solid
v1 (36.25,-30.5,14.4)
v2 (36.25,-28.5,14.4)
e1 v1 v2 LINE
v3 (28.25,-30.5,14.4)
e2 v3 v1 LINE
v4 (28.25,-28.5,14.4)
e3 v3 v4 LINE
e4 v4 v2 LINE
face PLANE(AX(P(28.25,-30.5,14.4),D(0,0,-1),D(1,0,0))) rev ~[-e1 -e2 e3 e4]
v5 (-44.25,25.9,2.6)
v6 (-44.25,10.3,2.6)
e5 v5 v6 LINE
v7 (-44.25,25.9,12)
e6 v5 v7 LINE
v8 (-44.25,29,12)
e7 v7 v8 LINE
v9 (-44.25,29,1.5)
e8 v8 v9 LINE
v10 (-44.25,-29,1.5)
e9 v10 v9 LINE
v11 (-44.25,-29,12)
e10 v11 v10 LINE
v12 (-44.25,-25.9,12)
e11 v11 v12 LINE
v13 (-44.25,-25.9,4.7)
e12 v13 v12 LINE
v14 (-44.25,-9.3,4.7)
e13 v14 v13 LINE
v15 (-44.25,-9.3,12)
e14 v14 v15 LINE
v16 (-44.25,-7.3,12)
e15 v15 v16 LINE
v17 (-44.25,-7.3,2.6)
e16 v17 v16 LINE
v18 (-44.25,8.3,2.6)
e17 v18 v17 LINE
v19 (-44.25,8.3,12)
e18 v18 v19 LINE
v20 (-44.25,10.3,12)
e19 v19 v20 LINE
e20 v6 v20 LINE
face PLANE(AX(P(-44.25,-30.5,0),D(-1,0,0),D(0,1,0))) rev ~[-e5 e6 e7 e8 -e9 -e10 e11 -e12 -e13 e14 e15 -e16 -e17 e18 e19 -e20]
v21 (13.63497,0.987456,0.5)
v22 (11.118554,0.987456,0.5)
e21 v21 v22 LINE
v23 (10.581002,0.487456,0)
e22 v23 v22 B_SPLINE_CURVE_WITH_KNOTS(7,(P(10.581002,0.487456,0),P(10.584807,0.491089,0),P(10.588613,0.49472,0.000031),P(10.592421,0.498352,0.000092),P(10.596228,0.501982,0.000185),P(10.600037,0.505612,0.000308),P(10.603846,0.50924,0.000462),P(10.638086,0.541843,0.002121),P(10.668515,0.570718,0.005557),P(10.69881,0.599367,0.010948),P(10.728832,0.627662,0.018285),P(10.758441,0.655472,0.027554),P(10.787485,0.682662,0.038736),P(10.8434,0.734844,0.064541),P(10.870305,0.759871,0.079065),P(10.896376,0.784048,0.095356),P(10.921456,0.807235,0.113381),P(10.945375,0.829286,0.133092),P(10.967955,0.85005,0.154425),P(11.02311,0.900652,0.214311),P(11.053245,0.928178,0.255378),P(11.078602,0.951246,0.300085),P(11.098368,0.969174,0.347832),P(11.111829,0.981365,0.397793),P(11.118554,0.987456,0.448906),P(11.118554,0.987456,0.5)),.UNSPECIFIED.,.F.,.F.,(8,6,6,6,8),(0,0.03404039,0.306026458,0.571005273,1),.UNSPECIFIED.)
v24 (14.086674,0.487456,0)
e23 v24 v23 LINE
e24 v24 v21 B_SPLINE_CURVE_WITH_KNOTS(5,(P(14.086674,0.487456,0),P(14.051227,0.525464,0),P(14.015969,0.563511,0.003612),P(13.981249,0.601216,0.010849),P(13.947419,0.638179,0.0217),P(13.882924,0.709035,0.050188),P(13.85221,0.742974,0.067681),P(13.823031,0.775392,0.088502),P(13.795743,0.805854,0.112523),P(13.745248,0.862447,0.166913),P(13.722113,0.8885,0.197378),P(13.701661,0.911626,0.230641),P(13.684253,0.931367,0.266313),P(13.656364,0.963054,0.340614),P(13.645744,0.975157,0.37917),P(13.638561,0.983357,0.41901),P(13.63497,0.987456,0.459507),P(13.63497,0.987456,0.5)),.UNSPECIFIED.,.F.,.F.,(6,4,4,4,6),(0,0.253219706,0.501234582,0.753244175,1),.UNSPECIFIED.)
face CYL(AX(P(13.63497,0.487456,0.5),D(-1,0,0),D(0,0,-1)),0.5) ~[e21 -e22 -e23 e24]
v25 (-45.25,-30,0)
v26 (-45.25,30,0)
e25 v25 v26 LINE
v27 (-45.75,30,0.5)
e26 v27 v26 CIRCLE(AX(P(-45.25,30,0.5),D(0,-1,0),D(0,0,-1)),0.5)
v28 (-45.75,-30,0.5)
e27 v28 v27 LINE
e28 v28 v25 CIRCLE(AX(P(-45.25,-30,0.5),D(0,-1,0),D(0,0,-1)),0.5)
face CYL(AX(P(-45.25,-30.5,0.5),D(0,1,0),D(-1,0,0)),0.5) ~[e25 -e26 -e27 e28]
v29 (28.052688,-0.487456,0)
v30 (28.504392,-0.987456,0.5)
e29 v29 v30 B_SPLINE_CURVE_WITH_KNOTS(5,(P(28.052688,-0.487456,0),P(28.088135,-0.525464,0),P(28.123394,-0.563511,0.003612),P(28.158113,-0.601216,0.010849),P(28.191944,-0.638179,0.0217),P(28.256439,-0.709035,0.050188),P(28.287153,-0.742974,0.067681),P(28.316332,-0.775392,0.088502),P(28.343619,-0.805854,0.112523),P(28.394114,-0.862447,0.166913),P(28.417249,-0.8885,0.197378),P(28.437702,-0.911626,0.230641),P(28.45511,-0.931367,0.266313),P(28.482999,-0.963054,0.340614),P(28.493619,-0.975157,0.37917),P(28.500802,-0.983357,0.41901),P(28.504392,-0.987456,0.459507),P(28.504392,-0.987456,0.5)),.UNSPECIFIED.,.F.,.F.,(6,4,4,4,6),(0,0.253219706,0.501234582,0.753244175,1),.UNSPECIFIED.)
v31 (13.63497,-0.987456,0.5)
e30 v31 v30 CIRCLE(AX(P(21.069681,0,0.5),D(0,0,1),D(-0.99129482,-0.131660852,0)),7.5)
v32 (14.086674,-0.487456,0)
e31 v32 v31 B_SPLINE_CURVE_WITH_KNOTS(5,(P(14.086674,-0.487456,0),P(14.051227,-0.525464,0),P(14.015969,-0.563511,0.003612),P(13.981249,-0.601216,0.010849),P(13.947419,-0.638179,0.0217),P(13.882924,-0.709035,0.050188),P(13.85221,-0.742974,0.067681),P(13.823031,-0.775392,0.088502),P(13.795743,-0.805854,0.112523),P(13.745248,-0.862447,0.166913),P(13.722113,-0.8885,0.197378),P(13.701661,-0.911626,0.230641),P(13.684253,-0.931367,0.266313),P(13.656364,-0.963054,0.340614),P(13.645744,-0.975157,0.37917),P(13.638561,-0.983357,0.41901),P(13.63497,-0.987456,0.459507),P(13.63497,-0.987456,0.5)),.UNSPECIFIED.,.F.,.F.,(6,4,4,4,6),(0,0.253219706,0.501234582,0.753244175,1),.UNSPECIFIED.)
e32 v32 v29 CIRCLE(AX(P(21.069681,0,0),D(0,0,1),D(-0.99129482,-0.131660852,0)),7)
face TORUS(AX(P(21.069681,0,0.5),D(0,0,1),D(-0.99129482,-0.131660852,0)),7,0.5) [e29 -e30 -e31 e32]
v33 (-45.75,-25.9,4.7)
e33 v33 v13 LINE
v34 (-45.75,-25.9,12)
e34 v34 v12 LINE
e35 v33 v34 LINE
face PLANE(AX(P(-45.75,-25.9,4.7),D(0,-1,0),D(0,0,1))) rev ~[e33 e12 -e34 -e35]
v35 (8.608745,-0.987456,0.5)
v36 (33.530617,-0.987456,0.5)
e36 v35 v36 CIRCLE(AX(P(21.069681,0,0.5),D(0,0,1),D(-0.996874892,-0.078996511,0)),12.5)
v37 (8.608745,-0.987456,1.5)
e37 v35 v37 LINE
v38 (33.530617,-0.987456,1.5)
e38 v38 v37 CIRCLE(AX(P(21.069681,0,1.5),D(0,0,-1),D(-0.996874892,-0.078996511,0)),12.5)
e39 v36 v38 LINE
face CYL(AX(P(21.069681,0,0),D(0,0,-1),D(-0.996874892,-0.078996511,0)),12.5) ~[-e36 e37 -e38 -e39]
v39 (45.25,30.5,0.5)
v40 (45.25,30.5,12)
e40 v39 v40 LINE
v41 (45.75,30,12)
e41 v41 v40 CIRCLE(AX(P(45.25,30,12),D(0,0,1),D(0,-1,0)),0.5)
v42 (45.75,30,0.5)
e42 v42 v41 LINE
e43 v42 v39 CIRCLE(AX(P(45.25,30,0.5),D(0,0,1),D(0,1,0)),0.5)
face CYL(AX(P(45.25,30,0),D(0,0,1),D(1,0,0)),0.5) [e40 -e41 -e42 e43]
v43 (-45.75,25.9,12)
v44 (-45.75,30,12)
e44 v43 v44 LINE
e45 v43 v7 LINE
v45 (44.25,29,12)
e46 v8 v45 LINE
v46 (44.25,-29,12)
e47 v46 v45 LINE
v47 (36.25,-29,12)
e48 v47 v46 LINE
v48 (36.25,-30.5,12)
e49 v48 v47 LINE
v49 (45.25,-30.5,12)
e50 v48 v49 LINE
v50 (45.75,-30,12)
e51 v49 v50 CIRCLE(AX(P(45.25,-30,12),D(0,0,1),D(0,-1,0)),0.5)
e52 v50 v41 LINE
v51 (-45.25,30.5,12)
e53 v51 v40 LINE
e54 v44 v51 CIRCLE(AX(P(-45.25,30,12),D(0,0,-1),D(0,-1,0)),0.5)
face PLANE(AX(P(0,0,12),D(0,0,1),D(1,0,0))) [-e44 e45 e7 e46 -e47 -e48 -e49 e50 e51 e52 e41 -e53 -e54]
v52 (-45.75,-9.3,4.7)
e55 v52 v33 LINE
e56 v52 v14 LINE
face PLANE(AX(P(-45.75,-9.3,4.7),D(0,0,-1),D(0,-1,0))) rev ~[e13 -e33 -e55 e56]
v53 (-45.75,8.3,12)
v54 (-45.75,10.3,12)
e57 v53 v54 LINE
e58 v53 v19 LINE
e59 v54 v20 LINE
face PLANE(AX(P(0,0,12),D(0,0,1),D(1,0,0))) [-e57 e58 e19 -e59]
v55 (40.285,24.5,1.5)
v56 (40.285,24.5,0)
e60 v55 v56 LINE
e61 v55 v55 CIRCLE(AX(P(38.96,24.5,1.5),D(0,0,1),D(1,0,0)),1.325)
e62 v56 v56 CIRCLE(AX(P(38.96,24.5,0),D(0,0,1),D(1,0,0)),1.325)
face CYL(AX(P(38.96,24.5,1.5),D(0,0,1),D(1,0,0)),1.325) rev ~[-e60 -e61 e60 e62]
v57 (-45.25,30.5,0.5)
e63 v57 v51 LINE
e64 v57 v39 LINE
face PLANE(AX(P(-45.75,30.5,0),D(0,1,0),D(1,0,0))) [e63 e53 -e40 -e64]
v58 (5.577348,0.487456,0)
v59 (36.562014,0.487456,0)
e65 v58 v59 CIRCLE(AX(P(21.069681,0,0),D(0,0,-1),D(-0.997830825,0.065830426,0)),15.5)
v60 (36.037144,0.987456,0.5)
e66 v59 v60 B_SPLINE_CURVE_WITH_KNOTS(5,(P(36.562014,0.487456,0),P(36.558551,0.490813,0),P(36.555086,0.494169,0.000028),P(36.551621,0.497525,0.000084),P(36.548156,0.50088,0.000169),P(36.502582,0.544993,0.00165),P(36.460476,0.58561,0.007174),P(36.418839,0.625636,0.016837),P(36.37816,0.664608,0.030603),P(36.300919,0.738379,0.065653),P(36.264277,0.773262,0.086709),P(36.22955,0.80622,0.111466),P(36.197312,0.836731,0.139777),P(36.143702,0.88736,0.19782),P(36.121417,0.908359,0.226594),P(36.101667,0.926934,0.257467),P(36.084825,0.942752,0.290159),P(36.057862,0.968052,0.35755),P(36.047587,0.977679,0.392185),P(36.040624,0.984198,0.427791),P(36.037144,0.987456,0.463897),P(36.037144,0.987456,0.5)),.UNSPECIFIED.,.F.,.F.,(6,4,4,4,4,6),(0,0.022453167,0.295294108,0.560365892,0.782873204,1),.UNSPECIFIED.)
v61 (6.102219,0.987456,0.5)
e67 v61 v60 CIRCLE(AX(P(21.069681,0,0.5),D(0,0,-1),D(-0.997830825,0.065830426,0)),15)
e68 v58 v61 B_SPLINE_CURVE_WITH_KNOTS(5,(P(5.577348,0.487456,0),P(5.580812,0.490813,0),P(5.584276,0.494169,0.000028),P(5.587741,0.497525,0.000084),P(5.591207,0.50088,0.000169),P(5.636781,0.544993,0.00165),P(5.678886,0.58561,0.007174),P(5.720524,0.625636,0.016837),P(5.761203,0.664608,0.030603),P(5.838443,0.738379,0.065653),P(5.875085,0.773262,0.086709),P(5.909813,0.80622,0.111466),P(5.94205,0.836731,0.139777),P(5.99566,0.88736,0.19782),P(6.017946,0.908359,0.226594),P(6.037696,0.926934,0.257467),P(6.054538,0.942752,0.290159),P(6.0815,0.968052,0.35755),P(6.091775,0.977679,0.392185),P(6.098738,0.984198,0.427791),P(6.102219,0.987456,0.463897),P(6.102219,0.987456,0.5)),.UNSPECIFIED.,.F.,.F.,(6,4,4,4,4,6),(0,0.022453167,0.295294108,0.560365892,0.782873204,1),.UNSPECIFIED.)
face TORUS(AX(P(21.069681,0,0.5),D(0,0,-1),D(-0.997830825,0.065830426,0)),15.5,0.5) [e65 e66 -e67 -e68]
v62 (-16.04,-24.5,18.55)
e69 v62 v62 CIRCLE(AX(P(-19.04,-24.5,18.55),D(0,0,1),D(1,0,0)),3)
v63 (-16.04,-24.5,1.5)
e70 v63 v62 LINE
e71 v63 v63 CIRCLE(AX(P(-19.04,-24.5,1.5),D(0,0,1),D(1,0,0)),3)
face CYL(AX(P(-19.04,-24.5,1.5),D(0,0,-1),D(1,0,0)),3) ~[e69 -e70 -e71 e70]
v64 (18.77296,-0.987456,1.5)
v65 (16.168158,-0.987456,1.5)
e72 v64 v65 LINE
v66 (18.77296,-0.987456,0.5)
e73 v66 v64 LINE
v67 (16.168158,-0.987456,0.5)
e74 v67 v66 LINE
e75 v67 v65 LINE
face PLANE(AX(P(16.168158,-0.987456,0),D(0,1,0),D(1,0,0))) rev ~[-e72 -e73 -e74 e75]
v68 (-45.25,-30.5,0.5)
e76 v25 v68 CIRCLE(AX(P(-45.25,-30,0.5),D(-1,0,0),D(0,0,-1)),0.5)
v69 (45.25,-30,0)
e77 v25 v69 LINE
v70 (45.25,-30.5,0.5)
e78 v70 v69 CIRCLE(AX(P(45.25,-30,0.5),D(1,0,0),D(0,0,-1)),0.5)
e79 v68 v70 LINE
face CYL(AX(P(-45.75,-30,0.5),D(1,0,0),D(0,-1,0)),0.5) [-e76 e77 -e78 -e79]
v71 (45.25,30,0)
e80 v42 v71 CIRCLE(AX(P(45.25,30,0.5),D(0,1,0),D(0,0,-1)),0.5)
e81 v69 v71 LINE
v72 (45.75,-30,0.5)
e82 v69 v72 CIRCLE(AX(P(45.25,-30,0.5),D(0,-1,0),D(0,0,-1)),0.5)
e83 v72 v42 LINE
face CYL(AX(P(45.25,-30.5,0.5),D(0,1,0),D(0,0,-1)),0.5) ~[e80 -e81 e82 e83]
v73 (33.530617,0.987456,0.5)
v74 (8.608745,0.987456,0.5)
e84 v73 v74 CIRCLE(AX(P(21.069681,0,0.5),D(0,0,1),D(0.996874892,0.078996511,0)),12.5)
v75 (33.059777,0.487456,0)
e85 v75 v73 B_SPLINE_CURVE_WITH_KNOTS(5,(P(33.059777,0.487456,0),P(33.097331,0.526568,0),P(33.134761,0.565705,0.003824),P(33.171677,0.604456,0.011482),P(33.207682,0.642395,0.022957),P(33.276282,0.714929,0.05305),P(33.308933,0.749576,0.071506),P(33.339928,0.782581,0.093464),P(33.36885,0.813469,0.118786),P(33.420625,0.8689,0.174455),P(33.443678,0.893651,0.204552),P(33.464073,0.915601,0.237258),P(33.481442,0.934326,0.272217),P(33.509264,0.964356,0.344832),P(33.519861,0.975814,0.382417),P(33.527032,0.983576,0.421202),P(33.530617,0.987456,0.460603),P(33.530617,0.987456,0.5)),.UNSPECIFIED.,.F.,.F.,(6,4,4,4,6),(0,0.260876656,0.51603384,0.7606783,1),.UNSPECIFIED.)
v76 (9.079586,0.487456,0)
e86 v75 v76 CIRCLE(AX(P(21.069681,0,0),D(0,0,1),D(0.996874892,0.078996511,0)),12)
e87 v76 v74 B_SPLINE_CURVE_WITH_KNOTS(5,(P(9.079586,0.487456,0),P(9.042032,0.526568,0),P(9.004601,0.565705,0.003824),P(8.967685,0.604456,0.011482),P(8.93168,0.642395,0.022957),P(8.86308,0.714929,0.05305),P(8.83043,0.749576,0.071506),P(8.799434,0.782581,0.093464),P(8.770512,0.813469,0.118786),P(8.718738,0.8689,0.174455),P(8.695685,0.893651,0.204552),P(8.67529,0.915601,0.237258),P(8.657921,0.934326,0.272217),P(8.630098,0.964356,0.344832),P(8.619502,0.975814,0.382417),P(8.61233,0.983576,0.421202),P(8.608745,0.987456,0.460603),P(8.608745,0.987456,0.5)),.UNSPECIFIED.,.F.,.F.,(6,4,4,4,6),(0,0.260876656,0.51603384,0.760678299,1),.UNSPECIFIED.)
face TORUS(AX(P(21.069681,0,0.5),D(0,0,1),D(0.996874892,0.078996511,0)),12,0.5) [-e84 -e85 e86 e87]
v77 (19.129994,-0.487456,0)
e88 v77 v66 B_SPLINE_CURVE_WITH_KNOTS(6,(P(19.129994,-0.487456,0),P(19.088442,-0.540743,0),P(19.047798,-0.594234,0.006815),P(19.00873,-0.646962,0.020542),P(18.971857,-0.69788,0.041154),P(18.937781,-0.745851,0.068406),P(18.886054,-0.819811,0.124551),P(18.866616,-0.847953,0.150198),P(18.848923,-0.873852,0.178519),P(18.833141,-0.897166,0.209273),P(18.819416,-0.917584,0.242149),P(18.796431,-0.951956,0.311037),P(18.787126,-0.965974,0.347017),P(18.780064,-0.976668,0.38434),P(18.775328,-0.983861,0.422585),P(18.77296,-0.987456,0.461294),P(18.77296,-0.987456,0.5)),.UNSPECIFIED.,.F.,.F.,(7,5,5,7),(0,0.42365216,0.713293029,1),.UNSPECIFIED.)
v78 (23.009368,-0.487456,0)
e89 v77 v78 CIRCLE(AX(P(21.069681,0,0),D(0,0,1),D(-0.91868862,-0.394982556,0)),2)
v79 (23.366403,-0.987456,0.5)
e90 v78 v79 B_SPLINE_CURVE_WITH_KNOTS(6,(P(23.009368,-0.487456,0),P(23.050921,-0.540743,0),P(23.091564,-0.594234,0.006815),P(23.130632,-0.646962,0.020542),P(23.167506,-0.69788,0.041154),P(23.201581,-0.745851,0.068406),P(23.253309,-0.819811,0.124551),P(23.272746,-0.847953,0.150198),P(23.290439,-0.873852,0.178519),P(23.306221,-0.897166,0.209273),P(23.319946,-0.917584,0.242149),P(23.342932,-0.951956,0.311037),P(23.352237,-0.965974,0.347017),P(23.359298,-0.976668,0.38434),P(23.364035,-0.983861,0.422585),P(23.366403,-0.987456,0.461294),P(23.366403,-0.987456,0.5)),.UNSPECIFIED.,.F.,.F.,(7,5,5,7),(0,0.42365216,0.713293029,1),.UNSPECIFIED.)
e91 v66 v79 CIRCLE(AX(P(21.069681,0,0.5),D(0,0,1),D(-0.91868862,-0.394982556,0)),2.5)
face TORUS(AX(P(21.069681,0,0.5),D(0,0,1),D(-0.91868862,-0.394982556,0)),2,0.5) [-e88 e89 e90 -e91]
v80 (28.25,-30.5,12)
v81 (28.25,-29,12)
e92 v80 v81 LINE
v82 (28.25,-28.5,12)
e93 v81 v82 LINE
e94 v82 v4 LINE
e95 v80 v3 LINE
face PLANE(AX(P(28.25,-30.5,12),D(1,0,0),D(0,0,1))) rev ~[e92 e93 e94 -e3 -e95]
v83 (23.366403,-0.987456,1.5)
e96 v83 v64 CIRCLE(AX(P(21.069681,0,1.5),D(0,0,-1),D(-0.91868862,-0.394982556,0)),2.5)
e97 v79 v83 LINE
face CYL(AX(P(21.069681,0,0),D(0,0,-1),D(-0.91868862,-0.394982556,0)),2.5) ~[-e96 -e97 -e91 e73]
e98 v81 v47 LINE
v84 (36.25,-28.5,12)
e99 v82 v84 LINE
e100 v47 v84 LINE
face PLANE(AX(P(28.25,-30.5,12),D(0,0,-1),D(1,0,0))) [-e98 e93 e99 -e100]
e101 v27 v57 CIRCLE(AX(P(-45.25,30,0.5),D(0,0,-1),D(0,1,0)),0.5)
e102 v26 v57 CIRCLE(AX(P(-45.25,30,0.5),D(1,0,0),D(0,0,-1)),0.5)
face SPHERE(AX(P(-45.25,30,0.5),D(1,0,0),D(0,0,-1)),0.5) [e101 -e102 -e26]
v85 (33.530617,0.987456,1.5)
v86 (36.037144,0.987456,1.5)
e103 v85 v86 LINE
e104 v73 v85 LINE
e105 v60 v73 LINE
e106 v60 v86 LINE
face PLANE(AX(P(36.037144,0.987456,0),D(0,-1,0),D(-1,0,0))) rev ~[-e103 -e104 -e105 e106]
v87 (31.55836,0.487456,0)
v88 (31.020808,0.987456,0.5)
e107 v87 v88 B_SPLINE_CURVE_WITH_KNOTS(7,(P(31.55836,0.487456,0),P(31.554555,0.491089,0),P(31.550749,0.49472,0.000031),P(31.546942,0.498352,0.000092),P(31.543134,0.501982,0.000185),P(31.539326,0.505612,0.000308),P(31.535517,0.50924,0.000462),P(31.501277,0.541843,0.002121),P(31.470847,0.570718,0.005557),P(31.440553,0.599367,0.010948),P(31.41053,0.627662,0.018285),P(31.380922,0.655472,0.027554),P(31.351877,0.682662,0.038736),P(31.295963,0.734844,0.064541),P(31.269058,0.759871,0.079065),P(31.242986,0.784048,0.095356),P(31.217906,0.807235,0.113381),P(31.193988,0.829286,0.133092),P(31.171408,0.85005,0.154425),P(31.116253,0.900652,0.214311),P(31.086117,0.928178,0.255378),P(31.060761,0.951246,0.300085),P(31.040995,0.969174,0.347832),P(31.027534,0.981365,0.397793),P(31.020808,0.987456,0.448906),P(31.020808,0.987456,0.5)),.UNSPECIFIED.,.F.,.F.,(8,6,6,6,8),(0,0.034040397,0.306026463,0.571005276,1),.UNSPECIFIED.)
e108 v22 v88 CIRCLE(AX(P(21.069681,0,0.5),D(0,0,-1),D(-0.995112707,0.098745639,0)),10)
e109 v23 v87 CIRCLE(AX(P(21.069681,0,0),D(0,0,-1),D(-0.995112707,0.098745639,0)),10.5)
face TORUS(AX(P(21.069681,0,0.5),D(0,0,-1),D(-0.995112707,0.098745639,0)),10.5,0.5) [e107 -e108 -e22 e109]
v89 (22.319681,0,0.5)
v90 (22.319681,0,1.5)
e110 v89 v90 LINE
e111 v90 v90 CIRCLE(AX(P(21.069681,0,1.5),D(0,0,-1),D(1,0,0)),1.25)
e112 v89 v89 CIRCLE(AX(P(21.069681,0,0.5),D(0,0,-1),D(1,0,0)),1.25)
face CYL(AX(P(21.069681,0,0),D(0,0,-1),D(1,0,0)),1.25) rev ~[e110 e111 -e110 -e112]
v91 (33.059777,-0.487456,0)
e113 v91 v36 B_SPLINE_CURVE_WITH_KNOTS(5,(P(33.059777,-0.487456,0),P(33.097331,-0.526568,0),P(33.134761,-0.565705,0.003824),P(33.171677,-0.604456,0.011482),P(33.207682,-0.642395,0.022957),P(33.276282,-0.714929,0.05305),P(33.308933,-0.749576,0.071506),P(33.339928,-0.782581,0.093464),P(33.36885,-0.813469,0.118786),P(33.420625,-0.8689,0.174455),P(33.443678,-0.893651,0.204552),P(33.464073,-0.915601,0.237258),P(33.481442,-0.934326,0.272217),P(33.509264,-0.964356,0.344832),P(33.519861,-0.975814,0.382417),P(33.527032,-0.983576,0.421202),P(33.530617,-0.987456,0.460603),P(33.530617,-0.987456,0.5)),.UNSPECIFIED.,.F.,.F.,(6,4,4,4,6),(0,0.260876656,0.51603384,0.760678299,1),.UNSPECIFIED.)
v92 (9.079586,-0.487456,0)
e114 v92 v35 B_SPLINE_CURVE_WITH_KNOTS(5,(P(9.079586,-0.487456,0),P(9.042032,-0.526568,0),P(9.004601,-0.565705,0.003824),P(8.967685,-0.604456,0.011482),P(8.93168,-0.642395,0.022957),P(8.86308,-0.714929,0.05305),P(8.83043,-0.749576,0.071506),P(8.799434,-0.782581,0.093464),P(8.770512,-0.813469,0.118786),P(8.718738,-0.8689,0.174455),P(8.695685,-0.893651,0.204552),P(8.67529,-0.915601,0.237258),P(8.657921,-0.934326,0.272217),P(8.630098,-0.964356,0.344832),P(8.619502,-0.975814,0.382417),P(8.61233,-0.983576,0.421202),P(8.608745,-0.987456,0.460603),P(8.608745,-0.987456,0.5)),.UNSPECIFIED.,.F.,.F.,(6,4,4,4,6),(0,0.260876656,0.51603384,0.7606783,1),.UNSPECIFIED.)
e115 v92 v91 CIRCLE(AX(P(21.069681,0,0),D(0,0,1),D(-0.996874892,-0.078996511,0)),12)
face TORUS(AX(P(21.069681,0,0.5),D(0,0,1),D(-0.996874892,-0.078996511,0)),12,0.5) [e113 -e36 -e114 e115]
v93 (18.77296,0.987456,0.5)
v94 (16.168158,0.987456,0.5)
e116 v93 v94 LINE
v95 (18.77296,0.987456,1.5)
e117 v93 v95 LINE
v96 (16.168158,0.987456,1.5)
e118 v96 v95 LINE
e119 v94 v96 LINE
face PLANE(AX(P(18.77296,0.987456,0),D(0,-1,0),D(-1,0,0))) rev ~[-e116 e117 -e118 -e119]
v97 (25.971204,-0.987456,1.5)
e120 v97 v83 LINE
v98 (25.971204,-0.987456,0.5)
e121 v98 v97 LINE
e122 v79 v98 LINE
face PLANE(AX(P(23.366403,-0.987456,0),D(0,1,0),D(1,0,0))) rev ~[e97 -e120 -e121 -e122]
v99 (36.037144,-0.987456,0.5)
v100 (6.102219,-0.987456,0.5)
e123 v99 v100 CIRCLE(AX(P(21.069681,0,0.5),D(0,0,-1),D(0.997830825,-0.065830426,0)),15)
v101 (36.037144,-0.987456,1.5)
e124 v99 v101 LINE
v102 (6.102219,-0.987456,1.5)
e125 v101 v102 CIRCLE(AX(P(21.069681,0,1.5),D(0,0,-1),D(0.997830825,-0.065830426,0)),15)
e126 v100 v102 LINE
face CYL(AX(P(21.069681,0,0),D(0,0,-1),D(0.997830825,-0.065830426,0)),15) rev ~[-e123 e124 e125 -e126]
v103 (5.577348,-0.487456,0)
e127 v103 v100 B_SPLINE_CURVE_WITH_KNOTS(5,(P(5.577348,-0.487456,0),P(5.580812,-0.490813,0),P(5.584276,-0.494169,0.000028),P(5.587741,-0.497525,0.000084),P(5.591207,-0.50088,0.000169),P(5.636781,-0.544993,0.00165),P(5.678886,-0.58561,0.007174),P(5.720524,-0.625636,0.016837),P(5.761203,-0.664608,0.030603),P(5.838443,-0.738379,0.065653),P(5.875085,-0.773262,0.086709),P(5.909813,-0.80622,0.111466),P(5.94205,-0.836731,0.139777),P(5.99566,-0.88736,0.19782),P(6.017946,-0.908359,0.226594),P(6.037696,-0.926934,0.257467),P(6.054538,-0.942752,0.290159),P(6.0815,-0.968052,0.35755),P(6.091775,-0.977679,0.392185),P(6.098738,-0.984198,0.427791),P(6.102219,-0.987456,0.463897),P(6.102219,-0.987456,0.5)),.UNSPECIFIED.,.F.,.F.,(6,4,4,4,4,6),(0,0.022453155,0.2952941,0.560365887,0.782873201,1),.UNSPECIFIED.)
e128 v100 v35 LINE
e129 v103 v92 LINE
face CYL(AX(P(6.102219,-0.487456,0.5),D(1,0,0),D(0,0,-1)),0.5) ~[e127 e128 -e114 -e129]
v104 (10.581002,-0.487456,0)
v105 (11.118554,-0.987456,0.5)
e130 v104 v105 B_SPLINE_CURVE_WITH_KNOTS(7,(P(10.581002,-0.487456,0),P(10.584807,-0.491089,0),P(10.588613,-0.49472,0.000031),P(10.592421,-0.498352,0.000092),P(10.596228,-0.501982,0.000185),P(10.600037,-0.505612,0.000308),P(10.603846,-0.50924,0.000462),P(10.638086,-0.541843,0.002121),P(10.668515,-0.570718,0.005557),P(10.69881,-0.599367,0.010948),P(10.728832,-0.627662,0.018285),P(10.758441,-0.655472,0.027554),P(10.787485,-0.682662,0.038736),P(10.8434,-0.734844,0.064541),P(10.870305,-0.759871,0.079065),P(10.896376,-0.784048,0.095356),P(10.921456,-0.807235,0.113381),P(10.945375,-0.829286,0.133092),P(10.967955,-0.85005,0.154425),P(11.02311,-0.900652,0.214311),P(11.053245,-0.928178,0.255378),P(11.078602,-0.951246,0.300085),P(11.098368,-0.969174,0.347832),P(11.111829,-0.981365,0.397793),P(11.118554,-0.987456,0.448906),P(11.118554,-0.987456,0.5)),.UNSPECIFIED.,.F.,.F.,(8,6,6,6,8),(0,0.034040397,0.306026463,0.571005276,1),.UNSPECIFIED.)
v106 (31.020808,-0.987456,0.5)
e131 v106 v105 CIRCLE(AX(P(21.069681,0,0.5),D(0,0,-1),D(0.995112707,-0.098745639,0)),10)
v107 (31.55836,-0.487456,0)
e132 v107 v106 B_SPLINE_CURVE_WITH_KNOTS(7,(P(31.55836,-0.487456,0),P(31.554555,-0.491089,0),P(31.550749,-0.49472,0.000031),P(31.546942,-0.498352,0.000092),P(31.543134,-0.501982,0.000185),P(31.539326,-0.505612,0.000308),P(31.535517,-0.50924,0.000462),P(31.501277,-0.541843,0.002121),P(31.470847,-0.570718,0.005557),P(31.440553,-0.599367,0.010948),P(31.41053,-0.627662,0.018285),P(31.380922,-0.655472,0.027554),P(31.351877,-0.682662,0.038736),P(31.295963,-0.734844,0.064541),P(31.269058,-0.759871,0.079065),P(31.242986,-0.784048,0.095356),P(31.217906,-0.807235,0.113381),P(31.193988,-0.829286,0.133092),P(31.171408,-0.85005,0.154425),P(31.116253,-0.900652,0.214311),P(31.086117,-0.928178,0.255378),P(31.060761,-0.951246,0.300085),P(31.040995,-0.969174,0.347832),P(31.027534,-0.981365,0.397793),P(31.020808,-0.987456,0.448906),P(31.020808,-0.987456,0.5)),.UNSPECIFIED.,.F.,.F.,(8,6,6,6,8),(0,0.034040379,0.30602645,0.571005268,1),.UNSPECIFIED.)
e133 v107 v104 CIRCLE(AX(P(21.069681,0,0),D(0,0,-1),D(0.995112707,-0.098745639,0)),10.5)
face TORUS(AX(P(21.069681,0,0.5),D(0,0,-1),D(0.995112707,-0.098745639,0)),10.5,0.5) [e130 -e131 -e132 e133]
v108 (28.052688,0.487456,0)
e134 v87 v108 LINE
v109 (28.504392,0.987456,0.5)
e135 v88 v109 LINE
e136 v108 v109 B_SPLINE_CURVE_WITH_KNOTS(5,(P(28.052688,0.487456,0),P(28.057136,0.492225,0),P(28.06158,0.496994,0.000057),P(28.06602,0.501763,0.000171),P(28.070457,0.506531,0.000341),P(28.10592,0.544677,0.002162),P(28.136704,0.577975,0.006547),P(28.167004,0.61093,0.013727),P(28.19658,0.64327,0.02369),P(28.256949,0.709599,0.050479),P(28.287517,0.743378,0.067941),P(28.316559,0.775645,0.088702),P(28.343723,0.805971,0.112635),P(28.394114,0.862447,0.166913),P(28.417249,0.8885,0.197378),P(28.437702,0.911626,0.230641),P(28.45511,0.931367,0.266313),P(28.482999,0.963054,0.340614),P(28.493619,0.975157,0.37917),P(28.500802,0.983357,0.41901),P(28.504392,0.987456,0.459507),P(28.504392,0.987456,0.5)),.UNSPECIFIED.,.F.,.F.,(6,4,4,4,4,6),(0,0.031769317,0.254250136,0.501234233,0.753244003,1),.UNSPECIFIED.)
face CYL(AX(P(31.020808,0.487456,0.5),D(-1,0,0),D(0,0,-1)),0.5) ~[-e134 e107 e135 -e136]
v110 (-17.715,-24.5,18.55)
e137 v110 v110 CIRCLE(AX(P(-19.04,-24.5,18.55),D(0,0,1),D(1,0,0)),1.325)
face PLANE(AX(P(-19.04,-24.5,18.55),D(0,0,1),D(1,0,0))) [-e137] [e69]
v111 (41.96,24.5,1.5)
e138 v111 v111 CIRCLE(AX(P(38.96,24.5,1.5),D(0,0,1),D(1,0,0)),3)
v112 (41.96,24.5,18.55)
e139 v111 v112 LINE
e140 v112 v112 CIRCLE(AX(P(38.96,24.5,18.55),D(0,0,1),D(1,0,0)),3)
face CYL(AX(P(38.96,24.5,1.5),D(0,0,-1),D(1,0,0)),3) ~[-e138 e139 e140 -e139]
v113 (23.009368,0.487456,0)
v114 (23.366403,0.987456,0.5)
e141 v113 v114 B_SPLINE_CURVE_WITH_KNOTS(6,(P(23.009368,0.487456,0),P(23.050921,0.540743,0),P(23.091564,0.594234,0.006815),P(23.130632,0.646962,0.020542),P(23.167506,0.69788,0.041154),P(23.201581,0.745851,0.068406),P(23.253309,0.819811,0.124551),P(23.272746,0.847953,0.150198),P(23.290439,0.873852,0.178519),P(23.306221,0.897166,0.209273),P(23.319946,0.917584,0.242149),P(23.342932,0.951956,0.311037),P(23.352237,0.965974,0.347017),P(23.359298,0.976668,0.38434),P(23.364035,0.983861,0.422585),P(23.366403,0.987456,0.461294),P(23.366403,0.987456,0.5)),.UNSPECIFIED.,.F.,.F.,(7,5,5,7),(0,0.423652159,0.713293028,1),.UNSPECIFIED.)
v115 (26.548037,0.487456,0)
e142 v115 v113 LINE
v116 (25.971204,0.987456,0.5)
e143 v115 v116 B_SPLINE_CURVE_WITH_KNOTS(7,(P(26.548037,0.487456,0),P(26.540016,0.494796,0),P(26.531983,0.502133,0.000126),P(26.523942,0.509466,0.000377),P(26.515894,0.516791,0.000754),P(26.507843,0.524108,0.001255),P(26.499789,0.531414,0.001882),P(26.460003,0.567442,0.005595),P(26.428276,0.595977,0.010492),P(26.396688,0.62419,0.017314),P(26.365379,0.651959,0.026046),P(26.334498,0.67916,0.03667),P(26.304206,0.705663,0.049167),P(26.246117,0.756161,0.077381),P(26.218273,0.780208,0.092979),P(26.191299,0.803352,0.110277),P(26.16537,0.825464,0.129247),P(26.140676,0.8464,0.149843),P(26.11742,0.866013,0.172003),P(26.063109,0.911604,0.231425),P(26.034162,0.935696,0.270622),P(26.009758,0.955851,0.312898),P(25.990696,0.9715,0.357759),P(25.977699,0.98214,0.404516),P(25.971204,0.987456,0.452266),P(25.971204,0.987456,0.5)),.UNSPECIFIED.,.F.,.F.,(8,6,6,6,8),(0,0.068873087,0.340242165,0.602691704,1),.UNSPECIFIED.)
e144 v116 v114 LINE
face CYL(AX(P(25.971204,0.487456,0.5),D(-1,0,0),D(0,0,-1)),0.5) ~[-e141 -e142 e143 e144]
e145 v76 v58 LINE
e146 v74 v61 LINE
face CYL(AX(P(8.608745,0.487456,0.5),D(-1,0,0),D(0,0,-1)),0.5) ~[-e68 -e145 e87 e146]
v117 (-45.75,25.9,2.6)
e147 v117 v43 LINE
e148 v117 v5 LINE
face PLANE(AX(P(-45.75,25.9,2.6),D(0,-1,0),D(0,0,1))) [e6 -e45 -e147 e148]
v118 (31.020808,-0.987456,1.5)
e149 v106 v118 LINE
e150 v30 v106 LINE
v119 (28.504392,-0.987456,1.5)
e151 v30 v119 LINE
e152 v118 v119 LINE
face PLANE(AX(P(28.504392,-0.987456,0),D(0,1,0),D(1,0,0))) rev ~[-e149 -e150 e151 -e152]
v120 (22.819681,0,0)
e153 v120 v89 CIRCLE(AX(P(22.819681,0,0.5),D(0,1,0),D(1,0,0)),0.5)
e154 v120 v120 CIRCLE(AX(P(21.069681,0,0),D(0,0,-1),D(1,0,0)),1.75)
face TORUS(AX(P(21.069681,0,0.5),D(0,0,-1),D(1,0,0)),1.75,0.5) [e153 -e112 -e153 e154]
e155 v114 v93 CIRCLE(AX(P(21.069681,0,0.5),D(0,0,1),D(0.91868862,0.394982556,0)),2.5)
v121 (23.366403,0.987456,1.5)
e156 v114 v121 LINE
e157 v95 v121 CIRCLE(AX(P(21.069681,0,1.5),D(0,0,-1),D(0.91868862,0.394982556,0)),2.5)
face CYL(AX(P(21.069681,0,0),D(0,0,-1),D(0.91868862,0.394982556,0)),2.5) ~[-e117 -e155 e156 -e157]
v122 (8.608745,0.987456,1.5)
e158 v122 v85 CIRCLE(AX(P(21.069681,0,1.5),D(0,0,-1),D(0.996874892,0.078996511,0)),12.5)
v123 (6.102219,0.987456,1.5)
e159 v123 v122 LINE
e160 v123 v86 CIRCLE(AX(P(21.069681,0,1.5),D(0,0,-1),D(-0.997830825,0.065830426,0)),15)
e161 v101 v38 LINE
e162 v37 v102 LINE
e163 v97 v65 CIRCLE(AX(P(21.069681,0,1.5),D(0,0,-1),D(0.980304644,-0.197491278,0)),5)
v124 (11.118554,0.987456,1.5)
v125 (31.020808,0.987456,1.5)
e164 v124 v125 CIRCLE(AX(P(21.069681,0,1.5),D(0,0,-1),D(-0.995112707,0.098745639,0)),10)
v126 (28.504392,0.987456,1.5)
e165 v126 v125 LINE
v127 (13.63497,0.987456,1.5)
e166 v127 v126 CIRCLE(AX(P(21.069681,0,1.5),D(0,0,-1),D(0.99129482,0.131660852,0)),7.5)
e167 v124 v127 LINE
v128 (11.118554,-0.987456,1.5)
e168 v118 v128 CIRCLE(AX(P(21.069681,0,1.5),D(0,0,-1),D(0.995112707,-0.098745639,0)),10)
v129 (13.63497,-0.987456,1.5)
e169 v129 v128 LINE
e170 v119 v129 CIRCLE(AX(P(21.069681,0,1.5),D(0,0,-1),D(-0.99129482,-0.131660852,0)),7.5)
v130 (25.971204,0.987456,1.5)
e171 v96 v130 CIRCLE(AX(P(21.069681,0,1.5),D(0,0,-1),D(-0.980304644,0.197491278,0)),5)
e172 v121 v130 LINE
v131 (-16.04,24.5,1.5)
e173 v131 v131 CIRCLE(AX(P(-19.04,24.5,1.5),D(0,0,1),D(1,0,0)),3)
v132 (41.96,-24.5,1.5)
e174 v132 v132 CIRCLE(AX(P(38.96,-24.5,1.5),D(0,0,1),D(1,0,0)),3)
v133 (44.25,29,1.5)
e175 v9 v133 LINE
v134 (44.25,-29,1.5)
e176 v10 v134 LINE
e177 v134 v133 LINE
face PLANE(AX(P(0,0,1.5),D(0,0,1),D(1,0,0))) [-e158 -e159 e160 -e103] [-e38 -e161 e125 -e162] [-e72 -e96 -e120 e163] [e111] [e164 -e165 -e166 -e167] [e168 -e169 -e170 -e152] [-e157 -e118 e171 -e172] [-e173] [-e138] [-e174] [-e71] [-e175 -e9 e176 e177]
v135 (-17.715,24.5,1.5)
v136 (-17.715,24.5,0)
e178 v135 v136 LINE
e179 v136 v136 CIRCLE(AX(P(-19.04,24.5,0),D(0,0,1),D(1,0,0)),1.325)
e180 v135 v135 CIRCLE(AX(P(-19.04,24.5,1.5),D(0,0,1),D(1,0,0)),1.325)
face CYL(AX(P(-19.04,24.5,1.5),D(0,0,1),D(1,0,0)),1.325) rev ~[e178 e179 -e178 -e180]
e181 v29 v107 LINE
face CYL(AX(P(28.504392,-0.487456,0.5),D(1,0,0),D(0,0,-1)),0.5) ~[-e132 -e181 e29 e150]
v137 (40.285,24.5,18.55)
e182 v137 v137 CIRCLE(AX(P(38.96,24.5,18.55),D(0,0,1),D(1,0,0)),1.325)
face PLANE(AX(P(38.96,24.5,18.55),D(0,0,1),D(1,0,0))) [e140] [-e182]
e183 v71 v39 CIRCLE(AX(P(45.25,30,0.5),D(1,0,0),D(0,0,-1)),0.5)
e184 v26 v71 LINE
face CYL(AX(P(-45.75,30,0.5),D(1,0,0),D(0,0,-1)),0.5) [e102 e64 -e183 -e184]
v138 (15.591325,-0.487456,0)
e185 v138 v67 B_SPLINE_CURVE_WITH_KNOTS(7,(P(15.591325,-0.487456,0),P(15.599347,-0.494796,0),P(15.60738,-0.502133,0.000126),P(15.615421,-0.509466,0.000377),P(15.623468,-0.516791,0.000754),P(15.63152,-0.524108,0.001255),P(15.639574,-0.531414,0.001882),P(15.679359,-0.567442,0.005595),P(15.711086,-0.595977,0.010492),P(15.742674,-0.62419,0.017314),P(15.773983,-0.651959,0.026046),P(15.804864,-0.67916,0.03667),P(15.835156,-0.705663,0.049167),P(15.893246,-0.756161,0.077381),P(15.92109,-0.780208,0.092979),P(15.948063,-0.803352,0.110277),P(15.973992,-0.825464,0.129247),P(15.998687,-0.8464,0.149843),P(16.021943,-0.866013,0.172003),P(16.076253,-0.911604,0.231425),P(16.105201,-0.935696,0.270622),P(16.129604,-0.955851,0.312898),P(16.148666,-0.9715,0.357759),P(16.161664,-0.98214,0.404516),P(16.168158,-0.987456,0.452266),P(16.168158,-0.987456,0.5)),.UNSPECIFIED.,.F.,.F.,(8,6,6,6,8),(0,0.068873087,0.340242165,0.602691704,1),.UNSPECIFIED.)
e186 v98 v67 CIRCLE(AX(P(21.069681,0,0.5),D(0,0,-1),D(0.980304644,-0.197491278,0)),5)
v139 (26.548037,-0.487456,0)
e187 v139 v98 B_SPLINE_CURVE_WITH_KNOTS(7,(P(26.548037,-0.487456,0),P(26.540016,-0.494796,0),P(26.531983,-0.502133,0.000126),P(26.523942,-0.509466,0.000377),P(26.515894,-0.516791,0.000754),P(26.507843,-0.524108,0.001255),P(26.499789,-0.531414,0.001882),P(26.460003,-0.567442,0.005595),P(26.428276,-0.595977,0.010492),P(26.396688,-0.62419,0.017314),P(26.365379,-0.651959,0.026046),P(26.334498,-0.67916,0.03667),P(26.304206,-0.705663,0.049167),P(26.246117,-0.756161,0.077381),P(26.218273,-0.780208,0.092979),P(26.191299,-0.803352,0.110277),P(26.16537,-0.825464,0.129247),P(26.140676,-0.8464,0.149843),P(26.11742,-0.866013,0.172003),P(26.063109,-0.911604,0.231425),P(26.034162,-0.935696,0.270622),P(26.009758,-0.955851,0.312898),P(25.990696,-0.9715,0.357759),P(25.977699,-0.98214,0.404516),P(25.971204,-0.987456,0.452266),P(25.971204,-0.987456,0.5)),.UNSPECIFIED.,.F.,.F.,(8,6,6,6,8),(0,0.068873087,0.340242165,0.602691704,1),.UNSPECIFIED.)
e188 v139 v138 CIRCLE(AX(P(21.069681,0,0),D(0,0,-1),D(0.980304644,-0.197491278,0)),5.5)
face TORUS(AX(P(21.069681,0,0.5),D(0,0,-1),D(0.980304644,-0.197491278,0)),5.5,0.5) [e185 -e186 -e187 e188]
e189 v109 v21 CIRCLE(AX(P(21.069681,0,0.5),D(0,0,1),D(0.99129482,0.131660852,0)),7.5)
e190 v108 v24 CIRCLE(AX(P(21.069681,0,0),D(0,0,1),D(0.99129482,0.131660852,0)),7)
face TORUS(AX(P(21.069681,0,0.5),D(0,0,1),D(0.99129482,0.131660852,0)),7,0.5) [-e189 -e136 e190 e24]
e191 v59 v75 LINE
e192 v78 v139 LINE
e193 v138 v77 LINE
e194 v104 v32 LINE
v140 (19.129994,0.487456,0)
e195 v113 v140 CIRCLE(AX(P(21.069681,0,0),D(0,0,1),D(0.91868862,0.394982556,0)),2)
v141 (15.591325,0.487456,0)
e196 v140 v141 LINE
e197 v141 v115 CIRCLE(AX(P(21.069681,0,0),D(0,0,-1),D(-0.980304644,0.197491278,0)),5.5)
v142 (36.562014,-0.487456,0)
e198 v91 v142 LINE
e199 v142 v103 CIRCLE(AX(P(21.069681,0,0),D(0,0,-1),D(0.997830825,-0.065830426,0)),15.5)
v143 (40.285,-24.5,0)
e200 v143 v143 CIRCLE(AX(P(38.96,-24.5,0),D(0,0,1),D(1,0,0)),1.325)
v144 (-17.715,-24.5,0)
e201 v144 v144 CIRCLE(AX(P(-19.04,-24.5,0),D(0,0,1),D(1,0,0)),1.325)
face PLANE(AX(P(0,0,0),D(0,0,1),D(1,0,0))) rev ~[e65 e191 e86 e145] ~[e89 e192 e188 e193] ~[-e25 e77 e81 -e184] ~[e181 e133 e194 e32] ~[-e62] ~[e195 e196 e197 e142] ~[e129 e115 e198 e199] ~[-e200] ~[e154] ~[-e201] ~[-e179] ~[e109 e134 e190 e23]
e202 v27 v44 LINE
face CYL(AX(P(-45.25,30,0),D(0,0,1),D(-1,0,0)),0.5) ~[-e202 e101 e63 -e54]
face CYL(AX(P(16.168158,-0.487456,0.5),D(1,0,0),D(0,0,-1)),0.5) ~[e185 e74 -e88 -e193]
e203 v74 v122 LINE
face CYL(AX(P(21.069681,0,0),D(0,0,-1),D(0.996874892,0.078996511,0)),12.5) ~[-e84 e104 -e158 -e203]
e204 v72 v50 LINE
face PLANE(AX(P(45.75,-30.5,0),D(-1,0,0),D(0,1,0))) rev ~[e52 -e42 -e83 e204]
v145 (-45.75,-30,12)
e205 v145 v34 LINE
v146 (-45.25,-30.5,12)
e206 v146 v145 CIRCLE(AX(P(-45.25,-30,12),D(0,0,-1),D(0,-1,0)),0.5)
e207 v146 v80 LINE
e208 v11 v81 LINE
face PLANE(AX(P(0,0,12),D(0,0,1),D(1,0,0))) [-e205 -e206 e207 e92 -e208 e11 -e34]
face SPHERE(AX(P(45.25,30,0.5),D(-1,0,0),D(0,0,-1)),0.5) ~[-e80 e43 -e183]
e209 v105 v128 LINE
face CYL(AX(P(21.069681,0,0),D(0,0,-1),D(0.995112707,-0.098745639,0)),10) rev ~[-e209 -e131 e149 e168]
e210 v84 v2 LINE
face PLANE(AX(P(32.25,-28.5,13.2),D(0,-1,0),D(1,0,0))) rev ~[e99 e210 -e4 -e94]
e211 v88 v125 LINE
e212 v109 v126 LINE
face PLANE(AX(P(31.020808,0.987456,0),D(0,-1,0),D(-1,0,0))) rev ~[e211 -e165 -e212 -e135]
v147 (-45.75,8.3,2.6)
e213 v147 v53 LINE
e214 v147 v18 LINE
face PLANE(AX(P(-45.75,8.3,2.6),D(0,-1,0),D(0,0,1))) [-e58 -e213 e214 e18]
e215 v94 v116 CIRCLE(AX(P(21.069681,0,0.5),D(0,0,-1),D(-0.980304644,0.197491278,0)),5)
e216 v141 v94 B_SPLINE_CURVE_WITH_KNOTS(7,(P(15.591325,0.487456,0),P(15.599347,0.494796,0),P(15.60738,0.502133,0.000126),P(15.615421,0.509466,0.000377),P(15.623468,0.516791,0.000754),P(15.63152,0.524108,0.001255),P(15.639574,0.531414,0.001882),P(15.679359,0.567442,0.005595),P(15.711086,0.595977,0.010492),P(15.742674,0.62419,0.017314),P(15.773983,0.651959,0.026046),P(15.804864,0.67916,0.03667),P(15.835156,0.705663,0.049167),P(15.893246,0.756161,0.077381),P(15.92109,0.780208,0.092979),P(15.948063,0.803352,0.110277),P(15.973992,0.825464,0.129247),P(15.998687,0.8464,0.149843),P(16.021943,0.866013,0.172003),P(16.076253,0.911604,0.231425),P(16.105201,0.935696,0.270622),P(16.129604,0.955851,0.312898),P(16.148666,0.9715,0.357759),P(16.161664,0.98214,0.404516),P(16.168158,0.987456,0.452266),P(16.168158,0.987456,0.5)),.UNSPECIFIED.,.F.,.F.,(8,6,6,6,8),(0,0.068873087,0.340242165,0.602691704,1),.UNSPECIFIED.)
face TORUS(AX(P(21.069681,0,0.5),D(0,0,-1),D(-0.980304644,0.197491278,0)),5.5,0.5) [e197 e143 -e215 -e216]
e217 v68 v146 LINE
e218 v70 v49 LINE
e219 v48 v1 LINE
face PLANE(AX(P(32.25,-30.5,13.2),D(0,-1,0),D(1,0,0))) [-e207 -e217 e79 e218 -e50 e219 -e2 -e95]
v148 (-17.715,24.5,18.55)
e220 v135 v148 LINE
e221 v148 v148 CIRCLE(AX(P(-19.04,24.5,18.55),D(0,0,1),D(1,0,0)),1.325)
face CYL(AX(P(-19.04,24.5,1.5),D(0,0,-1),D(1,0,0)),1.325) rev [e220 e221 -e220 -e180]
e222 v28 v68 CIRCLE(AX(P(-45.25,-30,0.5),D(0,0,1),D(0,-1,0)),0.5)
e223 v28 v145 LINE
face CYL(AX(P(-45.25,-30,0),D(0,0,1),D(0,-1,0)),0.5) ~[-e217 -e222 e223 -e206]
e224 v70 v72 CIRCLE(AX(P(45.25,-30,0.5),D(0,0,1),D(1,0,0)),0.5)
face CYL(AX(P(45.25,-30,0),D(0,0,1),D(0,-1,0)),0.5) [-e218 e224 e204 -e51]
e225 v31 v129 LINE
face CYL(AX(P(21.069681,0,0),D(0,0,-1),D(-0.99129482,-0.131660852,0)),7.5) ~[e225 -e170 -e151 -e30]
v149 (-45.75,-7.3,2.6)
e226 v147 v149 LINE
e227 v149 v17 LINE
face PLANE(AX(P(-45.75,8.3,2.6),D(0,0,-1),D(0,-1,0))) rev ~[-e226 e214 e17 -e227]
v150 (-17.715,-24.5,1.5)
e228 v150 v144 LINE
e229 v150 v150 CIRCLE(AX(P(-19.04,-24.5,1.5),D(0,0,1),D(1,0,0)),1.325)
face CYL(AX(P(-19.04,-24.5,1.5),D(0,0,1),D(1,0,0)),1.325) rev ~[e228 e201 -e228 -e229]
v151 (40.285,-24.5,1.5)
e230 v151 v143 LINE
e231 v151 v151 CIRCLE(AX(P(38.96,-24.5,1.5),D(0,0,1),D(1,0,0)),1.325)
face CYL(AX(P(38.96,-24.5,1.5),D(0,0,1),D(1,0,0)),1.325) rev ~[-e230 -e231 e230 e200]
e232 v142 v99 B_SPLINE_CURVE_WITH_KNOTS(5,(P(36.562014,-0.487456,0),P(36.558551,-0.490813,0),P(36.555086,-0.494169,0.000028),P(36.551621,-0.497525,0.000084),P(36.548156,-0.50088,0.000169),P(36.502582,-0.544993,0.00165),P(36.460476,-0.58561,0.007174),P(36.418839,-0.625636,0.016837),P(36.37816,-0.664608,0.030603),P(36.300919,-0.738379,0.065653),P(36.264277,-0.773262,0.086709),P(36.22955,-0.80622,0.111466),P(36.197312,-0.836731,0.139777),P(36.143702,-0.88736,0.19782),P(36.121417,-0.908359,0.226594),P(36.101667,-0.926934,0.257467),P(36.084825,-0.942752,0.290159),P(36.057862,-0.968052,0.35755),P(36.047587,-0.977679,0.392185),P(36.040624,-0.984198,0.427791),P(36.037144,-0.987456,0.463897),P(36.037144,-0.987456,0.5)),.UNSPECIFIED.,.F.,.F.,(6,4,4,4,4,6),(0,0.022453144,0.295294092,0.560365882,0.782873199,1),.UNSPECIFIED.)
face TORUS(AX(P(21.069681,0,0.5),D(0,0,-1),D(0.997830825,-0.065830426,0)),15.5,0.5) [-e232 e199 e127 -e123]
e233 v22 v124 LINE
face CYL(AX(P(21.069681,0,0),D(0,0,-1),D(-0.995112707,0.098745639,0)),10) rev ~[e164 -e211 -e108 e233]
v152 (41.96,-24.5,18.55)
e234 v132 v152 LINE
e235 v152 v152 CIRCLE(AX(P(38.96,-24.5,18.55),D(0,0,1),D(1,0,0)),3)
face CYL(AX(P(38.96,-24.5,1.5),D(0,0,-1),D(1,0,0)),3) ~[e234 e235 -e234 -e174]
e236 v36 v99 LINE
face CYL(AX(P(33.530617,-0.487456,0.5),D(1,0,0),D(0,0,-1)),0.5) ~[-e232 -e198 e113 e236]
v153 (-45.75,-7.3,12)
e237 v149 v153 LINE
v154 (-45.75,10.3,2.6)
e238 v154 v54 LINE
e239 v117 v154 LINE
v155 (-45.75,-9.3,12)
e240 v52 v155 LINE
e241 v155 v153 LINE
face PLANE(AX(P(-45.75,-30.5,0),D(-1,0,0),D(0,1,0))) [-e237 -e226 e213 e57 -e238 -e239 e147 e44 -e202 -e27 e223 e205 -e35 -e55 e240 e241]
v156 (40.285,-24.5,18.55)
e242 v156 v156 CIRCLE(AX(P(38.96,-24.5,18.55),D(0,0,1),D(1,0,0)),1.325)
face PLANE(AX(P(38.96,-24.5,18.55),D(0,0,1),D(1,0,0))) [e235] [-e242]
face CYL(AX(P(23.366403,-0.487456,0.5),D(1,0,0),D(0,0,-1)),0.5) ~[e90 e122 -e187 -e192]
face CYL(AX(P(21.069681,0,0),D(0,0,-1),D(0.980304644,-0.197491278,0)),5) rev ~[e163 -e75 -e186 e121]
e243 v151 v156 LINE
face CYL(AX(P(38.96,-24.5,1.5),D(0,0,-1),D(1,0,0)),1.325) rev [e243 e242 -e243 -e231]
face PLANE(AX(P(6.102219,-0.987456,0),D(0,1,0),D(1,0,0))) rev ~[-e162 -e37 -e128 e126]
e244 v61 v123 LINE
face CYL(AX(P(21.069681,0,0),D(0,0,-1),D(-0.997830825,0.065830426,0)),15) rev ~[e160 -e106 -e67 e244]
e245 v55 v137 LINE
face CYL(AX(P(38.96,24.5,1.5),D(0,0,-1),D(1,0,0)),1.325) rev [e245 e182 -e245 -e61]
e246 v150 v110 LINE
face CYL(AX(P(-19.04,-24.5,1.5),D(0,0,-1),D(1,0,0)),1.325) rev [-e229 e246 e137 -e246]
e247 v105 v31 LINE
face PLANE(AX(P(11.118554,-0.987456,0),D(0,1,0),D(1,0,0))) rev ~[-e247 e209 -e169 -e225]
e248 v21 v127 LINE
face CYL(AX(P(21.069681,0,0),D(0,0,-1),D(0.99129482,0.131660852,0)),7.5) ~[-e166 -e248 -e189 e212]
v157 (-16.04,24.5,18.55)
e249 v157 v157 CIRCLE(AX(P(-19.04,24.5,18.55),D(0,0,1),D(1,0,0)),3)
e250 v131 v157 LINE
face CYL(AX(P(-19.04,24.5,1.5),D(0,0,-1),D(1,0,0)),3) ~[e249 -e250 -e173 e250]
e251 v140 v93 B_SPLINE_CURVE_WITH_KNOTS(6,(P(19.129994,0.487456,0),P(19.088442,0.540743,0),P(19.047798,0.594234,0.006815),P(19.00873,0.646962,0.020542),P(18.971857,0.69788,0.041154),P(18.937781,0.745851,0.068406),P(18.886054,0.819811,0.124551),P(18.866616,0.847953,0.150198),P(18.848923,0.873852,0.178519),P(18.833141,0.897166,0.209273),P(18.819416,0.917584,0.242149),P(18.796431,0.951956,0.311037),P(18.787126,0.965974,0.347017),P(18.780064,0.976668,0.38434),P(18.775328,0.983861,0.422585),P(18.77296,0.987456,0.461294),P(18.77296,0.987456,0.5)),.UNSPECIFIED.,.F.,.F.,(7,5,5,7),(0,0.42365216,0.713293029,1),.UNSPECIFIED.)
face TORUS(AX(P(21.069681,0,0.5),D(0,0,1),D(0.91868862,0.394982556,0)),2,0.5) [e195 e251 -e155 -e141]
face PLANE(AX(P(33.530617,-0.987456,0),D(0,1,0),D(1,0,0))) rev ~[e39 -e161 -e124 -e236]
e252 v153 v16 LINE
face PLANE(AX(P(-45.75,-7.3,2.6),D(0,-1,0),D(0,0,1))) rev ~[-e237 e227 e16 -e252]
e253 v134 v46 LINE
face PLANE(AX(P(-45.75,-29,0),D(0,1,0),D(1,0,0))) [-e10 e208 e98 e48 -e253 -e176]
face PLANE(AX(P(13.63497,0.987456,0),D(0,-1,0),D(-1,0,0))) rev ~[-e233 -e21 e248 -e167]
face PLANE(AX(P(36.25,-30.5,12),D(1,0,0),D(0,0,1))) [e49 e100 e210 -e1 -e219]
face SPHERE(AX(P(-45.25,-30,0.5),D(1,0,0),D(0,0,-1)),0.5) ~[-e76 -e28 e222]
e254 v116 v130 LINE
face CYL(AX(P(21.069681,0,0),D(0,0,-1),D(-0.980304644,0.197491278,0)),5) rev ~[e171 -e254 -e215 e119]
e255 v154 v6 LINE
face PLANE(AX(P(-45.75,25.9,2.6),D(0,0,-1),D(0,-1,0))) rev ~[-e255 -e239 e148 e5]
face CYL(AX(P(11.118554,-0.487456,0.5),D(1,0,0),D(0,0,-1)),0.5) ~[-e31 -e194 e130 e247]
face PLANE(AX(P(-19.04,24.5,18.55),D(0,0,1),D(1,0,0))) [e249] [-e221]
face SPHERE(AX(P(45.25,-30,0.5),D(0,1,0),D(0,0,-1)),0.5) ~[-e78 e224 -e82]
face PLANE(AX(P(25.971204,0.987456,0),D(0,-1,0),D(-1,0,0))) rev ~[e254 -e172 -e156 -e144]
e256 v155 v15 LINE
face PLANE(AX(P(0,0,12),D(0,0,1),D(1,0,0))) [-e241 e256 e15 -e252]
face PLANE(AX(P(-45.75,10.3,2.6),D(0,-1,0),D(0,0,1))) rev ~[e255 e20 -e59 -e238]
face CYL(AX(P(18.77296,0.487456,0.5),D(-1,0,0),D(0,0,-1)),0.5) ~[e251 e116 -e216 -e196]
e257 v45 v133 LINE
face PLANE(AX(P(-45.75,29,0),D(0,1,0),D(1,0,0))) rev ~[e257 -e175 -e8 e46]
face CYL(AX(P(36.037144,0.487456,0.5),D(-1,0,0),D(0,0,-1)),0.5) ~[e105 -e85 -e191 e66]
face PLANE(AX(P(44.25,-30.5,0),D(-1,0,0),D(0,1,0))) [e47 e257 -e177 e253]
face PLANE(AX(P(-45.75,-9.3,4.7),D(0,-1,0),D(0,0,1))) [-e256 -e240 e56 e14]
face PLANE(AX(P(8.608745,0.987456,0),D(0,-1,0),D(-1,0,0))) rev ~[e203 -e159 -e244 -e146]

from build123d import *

# Parameters (mm, degrees)
F0_W      = 91.5
F0_H      = 61
F1_DEPTH  = 12
F2_T      = -1.5
F3_W      = 8
F3_H      = 2.4
F4_DEPTH  = 2
F5_W      = 16.6
F5_H      = 7.3
F5_W_2    = 15.6
F5_H_2    = 9.4
F6_DEPTH  = 2.1
F8_DEPTH  = 3
F9_R      = 1.25
F10_DEPTH = 3
F11_R     = 3
F11_R_2   = 1.325
F12_DEPTH = 17.05
F13_DEPTH = 25
F14_R     = 0.5
F15_R     = 0.5


with BuildPart() as f1:
    # F0 (on Top) → F1 (new body)
    with BuildSketch(Plane.XY):
        Rectangle(F0_W, F0_H)
    extrude(amount=F1_DEPTH)

    # F2
    f2_openings = [f1.faces().sort_by_distance(p)[0] for p in [
        (0, 0, 12),
    ]]
    offset(amount=F2_T, openings=f2_openings)

    # F3 (on face) → F4 (join)
    with BuildSketch(Plane.XZ.offset(30.5)):
        with Locations((32.25, 13.2)):
            Rectangle(F3_W, F3_H)
    extrude(amount=-F4_DEPTH)

    # F5 (on face) → F6 (cut)
    with BuildSketch(Plane(origin=(-45.75, 0, 0), x_dir=(0, -1, 0), z_dir=(-1, 0, 0))):
        with Locations((17.6, 8.35)):
            Rectangle(F5_W, F5_H)
        with Locations((-0.5, 7.3)):
            Rectangle(F5_W_2, F5_H_2)
        with Locations((-18.1, 7.3)):
            Rectangle(F5_W_2, F5_H_2)
    extrude(amount=-F6_DEPTH, mode=Mode.SUBTRACT)

    # F7 (on face) → F8 (cut)
    with BuildSketch(Plane(origin=(0, 0, 0), x_dir=(1, 0, 0), z_dir=(0, 0, -1))):
        with BuildLine():
            ThreePointArc((18.7729597218, 0.9874563896), (21.0696812719, 2.5), (23.366402822, 0.9874563896))
            Line((23.366402822, 0.9874563896), (25.9712044922, 0.9874563896))
            ThreePointArc((25.9712044922, 0.9874563896), (21.0696812719, 5), (16.1681580517, 0.9874563896))
            Line((16.1681580517, 0.9874563896), (18.7729597218, 0.9874563896))
        make_face()
        with BuildLine():
            Line((25.9712044922, -0.9874563896), (23.366402822, -0.9874563896))
            ThreePointArc((23.366402822, -0.9874563896), (21.0696812719, -2.5), (18.7729597218, -0.9874563896))
            Line((18.7729597218, -0.9874563896), (16.1681580517, -0.9874563896))
            ThreePointArc((16.1681580517, -0.9874563896), (21.0696812719, -5), (25.9712044922, -0.9874563896))
        make_face()
        with BuildLine():
            ThreePointArc((13.6349701223, 0.9874563896), (21.0696812719, 7.5), (28.5043924216, 0.9874563896))
            Line((28.5043924216, 0.9874563896), (31.0208083377, 0.9874563896))
            ThreePointArc((31.0208083377, 0.9874563896), (21.0696812719, 10), (11.1185542062, 0.9874563896))
            Line((11.1185542062, 0.9874563896), (13.6349701223, 0.9874563896))
        make_face()
        with BuildLine():
            Line((31.0208083377, -0.9874563896), (28.5043924216, -0.9874563896))
            ThreePointArc((28.5043924216, -0.9874563896), (21.0696812719, -7.5), (13.6349701223, -0.9874563896))
            Line((13.6349701223, -0.9874563896), (11.1185542062, -0.9874563896))
            ThreePointArc((11.1185542062, -0.9874563896), (21.0696812719, -10), (31.0208083377, -0.9874563896))
        make_face()
        with BuildLine():
            ThreePointArc((8.6087451161, 0.9874563896), (21.0696812719, 12.5), (33.5306174277, 0.9874563896))
            Line((33.5306174277, 0.9874563896), (36.0371436446, 0.9874563896))
            ThreePointArc((36.0371436446, 0.9874563896), (21.0696812719, 15), (6.1022188992, 0.9874563896))
            Line((6.1022188992, 0.9874563896), (8.6087451161, 0.9874563896))
        make_face()
        with BuildLine():
            Line((36.0371436446, -0.9874563896), (33.5306174277, -0.9874563896))
            ThreePointArc((33.5306174277, -0.9874563896), (21.0696812719, -12.5), (8.6087451161, -0.9874563896))
            Line((8.6087451161, -0.9874563896), (6.1022188992, -0.9874563896))
            ThreePointArc((6.1022188992, -0.9874563896), (21.0696812719, -15), (36.0371436446, -0.9874563896))
        make_face()
    extrude(amount=-F8_DEPTH, mode=Mode.SUBTRACT)

    # F9 (on face) → F10 (cut)
    with BuildSketch(Plane(origin=(0, 0, 0), x_dir=(1, 0, 0), z_dir=(0, 0, -1))):
        with Locations((21.0696812719, 0)):
            Circle(F9_R)
    extrude(amount=-F10_DEPTH, mode=Mode.SUBTRACT)

    # F11 (on face) → F12 (join)
    with BuildSketch(Plane.XY.offset(1.5)):
        with Locations((38.96, 24.5)):
            Circle(F11_R)
        with Locations((38.96, 24.5)):
            Circle(F11_R_2, mode=Mode.SUBTRACT)
        with Locations((38.96, -24.5)):
            Circle(F11_R)
        with Locations((38.96, -24.5)):
            Circle(F11_R_2, mode=Mode.SUBTRACT)
        with Locations((-19.04, 24.5)):
            Circle(F11_R)
        with Locations((-19.04, 24.5)):
            Circle(F11_R_2, mode=Mode.SUBTRACT)
        with Locations((-19.04, -24.5)):
            Circle(F11_R)
        with Locations((-19.04, -24.5)):
            Circle(F11_R_2, mode=Mode.SUBTRACT)
    extrude(amount=F12_DEPTH)

    # F13 (cut): faces of the model
    f13_faces = [f1.faces().sort_by_distance(p)[0] for p in [
        (38.96, 24.5, 1.5),
        (38.96, -24.5, 1.5),
        (-19.04, -24.5, 1.5),
        (-19.04, 24.5, 1.5),
    ]]
    extrude(f13_faces, amount=-F13_DEPTH, mode=Mode.SUBTRACT)

    # F14
    f14_edges = [f1.edges().sort_by_distance(p)[0] for p in [
        (0, 30.5, 0),
        (45.75, 0, 0),
        (0, -30.5, 0),
        (-45.75, 0, 0),
        (45.75, -30.5, 6),
        (-45.75, -30.5, 6),
        (-45.75, 30.5, 6),
        (45.75, 30.5, 6),
    ]]
    fillet(f14_edges, radius=F14_R)

    # F15
    f15_edges = [f1.edges().sort_by_distance(p)[0] for p in [
        (21.069681, 15, 0),
        (21.069681, -15, 0),
        (34.783881, 0.987456, 0),
        (34.783881, -0.987456, 0),
        (21.069681, 12.5, 0),
        (21.069681, -12.5, 0),
        (7.355482, -0.987456, 0),
        (7.355482, 0.987456, 0),
        (21.069681, -10, 0),
        (21.069681, 10, 0),
        (21.069681, 7.5, 0),
        (21.069681, -7.5, 0),
        (12.376762, -0.987456, 0),
        (29.7626, 0.987456, 0),
        (21.069681, 5, 0),
        (17.470559, 0.987456, 0),
        (21.069681, -5, 0),
        (24.668804, -0.987456, 0),
        (17.470559, -0.987456, 0),
        (24.668804, 0.987456, 0),
        (12.376762, 0.987456, 0),
        (29.7626, -0.987456, 0),
        (21.069681, 2.5, 0),
        (21.069681, -2.5, 0),
        (19.819681, 0, 0),
    ]]
    fillet(f15_edges, radius=F15_R)


solid = f1.part
